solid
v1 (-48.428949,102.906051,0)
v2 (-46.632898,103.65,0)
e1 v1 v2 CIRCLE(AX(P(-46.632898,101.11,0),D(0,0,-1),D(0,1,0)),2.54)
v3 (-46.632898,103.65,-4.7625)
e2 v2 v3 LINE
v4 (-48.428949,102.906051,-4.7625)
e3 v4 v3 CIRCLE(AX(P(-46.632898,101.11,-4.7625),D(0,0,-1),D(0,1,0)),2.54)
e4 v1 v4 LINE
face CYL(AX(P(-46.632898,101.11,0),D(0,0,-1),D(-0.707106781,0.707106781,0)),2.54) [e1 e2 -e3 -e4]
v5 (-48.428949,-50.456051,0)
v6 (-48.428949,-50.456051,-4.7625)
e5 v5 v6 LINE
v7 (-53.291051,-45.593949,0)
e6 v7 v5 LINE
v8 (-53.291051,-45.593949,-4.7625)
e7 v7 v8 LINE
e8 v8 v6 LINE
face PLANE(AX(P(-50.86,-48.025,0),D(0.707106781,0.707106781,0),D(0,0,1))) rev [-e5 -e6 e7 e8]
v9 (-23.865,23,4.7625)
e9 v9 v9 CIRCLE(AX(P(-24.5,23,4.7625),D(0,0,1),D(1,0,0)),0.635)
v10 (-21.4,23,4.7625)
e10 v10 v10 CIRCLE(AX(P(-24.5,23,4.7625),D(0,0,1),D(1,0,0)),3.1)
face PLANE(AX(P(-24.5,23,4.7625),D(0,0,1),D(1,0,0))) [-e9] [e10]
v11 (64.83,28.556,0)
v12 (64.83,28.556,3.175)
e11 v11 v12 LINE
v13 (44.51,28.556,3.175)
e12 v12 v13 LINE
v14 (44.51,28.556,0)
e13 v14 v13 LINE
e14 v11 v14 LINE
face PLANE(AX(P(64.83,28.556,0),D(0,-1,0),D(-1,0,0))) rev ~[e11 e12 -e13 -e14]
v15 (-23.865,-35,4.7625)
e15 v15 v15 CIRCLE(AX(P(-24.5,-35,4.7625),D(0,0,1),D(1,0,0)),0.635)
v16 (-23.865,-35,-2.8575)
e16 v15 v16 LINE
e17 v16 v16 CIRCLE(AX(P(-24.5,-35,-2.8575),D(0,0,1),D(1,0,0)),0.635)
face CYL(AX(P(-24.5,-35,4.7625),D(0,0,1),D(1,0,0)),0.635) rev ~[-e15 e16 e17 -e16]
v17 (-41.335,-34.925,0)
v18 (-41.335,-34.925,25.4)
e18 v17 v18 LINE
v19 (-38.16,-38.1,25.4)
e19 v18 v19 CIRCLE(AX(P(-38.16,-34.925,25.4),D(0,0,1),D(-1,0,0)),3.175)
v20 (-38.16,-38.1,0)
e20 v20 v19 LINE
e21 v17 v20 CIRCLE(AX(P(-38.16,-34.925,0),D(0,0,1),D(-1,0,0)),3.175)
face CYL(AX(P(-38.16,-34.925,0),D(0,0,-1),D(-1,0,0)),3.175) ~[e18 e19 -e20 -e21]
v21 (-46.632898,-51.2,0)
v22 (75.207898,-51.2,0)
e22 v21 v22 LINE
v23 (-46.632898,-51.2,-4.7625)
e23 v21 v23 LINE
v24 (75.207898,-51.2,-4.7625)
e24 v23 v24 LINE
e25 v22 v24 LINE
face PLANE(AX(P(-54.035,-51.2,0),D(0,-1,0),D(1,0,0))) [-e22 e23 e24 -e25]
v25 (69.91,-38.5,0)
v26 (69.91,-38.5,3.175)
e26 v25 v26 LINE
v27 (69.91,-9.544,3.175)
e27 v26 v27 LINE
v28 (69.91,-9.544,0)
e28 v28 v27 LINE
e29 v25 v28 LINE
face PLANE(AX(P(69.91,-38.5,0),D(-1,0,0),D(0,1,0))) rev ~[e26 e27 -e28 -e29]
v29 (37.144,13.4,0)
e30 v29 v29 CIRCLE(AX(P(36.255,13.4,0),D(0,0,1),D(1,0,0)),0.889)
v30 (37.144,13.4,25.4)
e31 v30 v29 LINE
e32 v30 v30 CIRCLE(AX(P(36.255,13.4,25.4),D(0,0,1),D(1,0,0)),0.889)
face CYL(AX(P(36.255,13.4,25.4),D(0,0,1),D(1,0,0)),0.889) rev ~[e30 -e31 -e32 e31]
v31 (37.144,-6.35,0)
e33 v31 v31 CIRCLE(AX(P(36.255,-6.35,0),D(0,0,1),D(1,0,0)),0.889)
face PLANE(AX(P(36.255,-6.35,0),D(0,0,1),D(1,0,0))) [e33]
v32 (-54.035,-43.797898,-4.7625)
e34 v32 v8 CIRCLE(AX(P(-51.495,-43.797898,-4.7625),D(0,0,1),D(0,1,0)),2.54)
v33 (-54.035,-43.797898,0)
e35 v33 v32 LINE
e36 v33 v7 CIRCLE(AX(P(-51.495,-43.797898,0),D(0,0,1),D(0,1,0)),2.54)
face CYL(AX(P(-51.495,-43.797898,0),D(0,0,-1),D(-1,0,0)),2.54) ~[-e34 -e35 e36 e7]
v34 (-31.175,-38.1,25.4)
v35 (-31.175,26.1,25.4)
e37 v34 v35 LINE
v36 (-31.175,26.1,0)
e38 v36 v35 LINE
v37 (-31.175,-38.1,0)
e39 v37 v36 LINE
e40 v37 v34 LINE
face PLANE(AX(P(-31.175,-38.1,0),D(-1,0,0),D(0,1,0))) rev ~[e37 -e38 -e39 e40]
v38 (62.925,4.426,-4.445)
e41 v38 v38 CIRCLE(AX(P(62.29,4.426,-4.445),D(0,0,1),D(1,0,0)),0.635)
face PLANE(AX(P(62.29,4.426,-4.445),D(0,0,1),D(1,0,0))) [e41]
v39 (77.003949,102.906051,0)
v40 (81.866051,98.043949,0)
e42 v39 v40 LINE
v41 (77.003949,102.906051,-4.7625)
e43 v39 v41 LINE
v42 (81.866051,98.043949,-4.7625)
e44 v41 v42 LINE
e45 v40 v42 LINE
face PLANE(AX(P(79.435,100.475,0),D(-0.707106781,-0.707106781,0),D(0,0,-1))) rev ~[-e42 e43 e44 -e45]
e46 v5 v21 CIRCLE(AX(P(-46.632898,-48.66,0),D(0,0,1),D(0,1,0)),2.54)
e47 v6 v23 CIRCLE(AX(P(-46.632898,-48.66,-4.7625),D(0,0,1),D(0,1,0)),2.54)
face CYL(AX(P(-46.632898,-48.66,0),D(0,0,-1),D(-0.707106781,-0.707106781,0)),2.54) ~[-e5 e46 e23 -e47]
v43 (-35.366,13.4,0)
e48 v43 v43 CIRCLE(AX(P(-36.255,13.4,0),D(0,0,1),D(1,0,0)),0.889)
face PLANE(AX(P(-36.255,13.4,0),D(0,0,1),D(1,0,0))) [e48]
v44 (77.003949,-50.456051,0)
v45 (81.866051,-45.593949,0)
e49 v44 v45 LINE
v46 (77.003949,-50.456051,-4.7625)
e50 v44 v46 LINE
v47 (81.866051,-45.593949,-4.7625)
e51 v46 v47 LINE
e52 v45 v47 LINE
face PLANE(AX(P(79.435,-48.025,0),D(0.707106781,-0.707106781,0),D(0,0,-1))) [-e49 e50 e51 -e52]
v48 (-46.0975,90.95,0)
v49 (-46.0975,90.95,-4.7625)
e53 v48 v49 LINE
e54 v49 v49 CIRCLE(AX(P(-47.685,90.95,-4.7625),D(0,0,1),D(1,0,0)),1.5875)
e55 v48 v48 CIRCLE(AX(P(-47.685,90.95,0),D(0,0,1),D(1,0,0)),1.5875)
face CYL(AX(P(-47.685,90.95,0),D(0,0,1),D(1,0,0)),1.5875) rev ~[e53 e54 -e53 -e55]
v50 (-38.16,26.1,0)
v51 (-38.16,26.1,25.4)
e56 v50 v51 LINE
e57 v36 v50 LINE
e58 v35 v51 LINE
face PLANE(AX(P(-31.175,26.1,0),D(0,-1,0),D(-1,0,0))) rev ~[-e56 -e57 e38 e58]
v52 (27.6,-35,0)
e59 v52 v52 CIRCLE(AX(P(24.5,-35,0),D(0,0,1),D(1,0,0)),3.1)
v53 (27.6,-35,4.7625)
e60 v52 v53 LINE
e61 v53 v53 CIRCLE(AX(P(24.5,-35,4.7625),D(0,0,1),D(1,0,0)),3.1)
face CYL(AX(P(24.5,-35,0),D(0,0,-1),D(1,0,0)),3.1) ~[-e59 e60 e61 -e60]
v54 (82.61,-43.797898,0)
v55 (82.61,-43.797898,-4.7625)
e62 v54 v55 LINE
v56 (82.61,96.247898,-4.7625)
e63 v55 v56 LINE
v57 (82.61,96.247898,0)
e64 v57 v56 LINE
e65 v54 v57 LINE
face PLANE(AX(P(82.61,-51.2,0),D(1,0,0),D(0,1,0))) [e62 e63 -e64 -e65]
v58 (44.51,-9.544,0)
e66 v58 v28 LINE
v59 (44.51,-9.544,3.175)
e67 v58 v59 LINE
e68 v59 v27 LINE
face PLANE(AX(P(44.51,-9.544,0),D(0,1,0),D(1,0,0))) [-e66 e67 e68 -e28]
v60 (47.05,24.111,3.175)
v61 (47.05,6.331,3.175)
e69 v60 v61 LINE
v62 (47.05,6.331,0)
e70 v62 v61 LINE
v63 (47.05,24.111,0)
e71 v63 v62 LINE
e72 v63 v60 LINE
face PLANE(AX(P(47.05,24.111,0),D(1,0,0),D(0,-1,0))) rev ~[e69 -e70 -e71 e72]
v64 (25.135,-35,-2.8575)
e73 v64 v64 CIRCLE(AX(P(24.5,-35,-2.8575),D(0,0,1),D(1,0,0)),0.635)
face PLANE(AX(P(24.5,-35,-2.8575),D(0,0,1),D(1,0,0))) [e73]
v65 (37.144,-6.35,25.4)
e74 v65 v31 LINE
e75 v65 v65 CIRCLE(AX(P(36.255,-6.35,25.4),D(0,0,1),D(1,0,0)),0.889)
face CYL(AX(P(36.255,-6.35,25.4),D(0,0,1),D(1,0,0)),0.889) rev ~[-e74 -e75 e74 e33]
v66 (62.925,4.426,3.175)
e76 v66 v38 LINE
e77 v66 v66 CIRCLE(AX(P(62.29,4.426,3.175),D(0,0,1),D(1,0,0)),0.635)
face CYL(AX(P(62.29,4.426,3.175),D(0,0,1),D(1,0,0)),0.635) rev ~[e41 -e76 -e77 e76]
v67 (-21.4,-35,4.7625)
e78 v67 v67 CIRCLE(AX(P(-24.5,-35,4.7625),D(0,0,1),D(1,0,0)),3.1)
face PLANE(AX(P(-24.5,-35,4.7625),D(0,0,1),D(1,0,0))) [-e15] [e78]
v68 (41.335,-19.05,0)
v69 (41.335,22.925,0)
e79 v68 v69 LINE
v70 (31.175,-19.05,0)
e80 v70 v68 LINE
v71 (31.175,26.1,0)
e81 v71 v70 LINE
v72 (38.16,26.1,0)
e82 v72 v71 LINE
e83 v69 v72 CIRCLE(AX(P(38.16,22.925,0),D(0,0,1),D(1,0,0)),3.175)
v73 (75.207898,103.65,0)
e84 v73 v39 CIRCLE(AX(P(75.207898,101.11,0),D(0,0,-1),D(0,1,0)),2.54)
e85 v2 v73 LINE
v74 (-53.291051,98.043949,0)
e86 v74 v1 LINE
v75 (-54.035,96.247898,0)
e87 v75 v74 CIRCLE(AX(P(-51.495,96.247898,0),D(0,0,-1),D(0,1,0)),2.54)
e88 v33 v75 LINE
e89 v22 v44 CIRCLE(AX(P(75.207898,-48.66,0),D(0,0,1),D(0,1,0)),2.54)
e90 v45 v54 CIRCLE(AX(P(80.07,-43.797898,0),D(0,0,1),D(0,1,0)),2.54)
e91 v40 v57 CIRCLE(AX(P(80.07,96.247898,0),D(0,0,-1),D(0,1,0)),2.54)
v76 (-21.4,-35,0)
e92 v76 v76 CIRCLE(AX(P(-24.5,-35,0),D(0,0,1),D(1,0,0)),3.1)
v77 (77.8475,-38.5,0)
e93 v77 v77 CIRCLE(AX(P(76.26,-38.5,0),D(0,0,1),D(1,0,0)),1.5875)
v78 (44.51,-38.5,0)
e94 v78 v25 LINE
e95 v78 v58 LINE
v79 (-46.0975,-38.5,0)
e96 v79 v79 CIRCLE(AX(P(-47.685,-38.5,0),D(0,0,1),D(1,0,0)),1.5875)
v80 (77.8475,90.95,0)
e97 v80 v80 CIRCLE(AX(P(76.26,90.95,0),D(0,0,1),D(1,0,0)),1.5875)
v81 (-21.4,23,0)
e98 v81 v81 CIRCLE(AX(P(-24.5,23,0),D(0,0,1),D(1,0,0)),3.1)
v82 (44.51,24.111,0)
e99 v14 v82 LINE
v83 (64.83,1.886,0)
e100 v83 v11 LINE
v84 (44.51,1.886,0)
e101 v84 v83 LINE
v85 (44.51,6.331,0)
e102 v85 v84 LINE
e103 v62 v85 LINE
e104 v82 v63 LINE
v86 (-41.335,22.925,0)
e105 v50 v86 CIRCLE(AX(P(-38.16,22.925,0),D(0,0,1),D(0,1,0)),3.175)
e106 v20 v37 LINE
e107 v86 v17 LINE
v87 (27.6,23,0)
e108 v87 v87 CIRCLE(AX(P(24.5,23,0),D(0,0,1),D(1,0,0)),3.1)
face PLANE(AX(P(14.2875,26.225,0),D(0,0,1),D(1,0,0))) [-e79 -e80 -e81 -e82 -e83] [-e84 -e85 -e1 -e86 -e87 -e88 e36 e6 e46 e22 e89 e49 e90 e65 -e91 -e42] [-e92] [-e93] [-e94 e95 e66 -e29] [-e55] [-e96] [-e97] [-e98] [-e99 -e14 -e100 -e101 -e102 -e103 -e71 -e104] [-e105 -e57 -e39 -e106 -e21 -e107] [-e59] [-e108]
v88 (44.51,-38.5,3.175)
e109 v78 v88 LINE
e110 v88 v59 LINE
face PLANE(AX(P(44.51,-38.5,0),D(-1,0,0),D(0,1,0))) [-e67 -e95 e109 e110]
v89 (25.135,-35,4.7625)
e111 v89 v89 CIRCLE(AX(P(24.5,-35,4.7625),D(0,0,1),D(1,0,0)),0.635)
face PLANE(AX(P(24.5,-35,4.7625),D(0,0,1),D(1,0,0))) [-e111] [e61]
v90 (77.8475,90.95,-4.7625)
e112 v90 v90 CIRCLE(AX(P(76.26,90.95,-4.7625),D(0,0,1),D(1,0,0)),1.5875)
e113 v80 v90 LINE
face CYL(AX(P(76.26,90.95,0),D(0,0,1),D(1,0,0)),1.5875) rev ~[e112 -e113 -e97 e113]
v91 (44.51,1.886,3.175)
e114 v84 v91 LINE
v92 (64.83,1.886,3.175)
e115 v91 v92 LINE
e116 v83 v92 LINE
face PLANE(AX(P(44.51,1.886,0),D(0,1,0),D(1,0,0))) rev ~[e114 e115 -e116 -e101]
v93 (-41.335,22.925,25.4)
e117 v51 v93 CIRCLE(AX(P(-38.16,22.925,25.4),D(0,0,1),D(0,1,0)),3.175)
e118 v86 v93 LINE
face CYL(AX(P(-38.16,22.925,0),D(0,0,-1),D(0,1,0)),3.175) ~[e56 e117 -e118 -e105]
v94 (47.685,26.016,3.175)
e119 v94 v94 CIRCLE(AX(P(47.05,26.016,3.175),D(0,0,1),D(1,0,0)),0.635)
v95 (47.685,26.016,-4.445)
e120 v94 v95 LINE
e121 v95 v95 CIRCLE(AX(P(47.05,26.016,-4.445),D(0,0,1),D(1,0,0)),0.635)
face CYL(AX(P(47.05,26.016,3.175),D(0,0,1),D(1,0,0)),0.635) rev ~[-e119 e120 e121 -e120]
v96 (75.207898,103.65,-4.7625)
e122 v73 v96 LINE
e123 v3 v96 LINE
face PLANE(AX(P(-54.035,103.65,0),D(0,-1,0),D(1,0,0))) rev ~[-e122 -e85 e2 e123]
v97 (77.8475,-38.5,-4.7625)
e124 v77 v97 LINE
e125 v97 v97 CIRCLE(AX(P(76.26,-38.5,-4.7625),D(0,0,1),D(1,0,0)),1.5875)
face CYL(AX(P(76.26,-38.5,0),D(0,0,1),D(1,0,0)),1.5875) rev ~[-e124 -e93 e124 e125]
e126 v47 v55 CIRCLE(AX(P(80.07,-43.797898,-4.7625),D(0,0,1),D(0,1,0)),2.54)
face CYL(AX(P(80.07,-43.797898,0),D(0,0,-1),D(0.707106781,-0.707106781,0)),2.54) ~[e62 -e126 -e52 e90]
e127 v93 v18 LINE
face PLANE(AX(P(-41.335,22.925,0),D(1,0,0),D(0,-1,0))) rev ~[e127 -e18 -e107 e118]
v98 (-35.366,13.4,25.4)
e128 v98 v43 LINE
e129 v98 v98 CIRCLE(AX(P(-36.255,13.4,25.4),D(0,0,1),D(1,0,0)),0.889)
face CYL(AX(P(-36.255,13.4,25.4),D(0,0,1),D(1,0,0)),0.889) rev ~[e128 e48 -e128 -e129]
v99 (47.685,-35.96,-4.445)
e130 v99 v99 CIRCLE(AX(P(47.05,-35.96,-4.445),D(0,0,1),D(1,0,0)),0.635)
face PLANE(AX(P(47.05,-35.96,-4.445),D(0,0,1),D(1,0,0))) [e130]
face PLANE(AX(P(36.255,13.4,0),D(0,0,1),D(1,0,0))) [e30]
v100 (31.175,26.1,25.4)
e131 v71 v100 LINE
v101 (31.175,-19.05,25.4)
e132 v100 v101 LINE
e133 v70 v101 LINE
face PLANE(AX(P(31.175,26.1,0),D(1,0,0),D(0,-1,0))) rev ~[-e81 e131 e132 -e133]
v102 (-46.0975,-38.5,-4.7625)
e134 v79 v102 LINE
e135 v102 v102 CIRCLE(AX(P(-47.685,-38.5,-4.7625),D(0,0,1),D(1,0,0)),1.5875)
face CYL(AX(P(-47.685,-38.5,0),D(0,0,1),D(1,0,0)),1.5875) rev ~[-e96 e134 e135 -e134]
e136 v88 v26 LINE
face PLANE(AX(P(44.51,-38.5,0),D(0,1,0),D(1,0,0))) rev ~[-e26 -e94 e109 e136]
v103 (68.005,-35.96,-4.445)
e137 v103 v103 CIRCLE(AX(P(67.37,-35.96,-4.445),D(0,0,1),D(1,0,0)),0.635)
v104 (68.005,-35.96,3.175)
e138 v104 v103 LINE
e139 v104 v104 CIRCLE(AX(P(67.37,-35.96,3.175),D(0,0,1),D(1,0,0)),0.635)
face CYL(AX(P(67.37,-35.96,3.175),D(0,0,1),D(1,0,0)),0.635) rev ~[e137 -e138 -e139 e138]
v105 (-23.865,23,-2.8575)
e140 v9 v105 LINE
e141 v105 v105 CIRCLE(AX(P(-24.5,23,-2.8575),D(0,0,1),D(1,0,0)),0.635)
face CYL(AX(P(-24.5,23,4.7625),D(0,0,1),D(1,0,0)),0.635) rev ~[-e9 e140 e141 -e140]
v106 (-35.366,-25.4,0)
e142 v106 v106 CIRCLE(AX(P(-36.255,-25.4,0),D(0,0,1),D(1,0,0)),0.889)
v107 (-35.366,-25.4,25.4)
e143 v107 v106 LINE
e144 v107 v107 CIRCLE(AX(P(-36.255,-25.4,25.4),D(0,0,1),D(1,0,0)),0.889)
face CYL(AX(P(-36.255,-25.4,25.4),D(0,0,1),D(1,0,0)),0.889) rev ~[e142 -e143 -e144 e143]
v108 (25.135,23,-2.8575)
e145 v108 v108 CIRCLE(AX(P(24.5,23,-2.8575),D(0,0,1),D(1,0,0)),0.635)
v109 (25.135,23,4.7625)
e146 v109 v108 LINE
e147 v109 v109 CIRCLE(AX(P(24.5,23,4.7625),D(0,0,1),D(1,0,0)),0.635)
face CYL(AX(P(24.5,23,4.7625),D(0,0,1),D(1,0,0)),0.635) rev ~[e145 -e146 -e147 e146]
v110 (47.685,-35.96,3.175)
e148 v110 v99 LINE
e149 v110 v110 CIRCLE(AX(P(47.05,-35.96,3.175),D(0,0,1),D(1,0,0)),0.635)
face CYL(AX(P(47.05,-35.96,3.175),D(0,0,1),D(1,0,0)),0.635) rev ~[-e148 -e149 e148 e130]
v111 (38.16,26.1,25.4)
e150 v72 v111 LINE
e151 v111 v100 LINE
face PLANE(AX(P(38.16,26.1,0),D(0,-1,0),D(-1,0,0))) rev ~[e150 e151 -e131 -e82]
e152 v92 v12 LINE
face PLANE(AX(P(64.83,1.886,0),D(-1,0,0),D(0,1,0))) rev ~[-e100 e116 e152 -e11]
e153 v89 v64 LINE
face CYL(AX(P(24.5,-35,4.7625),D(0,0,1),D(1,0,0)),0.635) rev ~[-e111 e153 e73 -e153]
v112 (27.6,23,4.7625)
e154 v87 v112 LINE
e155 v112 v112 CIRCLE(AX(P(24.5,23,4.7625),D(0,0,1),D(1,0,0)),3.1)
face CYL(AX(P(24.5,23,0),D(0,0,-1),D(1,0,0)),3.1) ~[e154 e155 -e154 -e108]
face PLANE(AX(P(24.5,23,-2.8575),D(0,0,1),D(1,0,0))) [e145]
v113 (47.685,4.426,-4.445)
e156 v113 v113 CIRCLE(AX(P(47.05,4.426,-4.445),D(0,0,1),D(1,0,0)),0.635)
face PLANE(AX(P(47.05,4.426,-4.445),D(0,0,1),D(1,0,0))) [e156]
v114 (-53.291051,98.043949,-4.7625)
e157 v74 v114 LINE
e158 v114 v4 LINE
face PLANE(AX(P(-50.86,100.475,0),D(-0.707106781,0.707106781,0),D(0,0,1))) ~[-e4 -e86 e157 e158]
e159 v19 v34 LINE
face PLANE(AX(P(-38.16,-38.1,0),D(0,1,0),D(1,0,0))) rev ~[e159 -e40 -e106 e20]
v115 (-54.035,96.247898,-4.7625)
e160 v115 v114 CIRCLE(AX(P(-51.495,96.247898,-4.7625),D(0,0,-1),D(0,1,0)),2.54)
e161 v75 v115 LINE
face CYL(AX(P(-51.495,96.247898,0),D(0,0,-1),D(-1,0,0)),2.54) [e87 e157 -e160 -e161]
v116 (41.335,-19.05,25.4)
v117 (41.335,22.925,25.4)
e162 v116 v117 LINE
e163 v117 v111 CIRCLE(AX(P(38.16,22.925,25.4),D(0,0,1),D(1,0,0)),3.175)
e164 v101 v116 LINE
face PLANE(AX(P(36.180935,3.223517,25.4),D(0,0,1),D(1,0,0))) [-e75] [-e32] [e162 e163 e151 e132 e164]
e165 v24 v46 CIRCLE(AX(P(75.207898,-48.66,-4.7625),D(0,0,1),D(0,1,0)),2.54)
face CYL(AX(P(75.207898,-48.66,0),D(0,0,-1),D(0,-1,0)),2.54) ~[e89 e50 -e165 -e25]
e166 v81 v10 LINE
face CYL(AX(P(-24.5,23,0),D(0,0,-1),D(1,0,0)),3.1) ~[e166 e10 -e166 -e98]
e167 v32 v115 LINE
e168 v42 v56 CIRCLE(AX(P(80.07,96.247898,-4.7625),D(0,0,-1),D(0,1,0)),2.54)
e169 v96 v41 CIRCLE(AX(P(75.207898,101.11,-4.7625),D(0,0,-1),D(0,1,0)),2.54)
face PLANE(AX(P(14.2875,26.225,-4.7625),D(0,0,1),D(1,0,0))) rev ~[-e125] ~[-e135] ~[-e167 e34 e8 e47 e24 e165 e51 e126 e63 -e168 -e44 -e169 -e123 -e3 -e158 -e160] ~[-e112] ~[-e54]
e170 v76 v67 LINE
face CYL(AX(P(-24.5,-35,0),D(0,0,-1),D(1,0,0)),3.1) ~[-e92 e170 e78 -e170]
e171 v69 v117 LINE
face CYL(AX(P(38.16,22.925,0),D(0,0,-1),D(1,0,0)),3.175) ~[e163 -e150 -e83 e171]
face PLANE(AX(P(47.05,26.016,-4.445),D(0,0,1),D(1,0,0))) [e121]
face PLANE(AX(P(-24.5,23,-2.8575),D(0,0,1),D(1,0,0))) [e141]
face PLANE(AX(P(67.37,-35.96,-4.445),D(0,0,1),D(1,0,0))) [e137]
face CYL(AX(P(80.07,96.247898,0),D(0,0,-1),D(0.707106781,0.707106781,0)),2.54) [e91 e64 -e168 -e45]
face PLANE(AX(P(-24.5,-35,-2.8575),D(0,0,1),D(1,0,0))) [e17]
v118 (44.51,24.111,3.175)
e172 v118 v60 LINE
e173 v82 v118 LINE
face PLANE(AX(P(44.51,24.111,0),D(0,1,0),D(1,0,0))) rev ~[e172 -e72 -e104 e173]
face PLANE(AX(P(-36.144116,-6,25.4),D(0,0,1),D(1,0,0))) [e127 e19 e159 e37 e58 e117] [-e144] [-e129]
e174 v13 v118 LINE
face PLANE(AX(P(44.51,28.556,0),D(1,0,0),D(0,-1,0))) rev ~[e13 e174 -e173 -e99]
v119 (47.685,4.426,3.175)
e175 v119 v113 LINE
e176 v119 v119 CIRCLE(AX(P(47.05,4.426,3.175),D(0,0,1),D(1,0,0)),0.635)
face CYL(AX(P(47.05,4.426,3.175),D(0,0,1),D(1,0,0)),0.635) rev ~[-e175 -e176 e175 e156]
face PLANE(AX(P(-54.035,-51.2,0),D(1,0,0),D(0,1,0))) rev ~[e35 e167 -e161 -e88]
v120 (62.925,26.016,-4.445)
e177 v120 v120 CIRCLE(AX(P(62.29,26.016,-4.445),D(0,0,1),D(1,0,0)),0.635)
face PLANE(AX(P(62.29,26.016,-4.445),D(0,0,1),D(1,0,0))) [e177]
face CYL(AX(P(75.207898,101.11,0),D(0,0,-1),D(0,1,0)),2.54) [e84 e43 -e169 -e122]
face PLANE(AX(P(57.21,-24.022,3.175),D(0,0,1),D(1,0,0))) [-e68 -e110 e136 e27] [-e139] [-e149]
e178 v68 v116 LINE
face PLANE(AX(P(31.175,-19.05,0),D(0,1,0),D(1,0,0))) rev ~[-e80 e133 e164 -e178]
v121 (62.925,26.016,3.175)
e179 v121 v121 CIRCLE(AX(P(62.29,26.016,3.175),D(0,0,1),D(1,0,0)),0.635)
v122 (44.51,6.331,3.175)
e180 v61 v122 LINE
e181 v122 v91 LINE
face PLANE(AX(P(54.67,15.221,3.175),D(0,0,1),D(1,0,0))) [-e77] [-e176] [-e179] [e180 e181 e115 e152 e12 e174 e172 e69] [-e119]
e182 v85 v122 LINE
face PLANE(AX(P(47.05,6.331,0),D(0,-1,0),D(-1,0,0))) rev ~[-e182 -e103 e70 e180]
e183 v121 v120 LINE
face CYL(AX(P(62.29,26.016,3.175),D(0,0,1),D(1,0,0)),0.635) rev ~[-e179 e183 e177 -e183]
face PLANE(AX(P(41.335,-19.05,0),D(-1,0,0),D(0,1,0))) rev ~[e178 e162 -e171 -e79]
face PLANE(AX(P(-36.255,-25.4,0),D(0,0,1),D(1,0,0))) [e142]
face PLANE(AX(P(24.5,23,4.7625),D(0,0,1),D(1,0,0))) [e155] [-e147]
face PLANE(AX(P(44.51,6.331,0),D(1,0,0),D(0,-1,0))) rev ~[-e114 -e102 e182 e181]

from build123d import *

# Parameters (mm, degrees)
F4_W      = 136.645
F4_H      = 154.85
F5_DEPTH  = 4.7625
F0_R      = 3.1
F0_R_2    = 1.375
F6_DEPTH  = 4.7625
F7_DEPTH  = 25.4
F3_R      = 1.143
F8_DEPTH  = 3.175
F2_W      = 25.4
F2_H      = 28.956
F2_R      = 1.143
F9_DEPTH  = 3.175
F10_R     = 0.635
F11_DEPTH = 7.62
F12_R     = 0.635
F14_DEPTH = 7.62
F15_R     = 0.889
F16_DEPTH = 25.4
F17_SIZE  = 6.35
F18_R     = 2.54
F19_R     = 1.5875
F20_DEPTH = 4.7635


# Not quite as in the source:
# - a feature names something its author has since deleted; it is built from what else it names


with BuildPart() as f5:
    # F4 (on Top) → F5 (new body)
    with BuildSketch(Plane.XY):
        with Locations((14.2875, 26.225)):
            Rectangle(F4_W, F4_H)
    extrude(amount=-F5_DEPTH)

    # F0 (on Top) → F6 (join)
    with BuildSketch(Plane.XY):
        with Locations((-24.5, 23)):
            Circle(F0_R)
        with Locations((-24.5, 23)):
            Circle(F0_R_2, mode=Mode.SUBTRACT)
        with Locations((24.5, 23)):
            Circle(F0_R)
        with Locations((24.5, 23)):
            Circle(F0_R_2, mode=Mode.SUBTRACT)
        with Locations((-24.5, -35)):
            Circle(F0_R)
        with Locations((-24.5, -35)):
            Circle(F0_R_2, mode=Mode.SUBTRACT)
        with Locations((24.5, -35)):
            Circle(F0_R)
        with Locations((24.5, -35)):
            Circle(F0_R_2, mode=Mode.SUBTRACT)
        with Locations((-24.5, 23)):
            Circle(F0_R_2)
        with Locations((24.5, 23)):
            Circle(F0_R_2)
        with Locations((-24.5, -35)):
            Circle(F0_R_2)
        with Locations((24.5, -35)):
            Circle(F0_R_2)
    extrude(amount=F6_DEPTH)

    # F1 (on Top) → F7 (join)
    with BuildSketch(Plane.XY):
        with BuildLine():
            ThreePointArc((-41.335, -34.925), (-40.4050640303, -37.1700640303), (-38.16, -38.1))
            Line((-38.16, -38.1), (-34.35, -38.1))
            Line((-34.35, -38.1), (-31.175, -38.1))
            Line((-31.175, -38.1), (-31.175, -34.925))
            Line((-31.175, -34.925), (-31.175, 22.925))
            Line((-31.175, 22.925), (-31.175, 26.1))
            Line((-31.175, 26.1), (-38.16, 26.1))
            ThreePointArc((-38.16, 26.1), (-40.4050640303, 25.1700640303), (-41.335, 22.925))
            Line((-41.335, 22.925), (-41.335, -34.925))
        make_face()
        with BuildLine():
            Line((31.175, 26.1), (31.175, 22.925))
            Line((31.175, 22.925), (31.175, -19.05))
            Line((31.175, -19.05), (41.335, -19.05))
            Line((41.335, -19.05), (41.335, 22.925))
            ThreePointArc((41.335, 22.925), (40.4050640303, 25.1700640303), (38.16, 26.1))
            Line((38.16, 26.1), (31.175, 26.1))
        make_face()
    extrude(amount=F7_DEPTH)

    # F3 (on Top) → F8 (join)
    with BuildSketch(Plane.XY):
        Polygon((64.83, 28.556), (44.51, 28.556), (44.51, 24.111), (47.05, 24.111), (47.05, 6.331), (44.51, 6.331), (44.51, 1.886), (64.83, 1.886), align=None)
        with Locations((47.05, 4.426)):
            Circle(F3_R, mode=Mode.SUBTRACT)
        with Locations((62.29, 4.426)):
            Circle(F3_R, mode=Mode.SUBTRACT)
        with Locations((47.05, 26.016)):
            Circle(F3_R, mode=Mode.SUBTRACT)
        with Locations((62.29, 26.016)):
            Circle(F3_R, mode=Mode.SUBTRACT)
        with Locations((62.29, 4.426)):
            Circle(F3_R)
        with Locations((62.29, 26.016)):
            Circle(F3_R)
        with Locations((47.05, 26.016)):
            Circle(F3_R)
        with Locations((47.05, 4.426)):
            Circle(F3_R)
    extrude(amount=F8_DEPTH)

    # F2 (on Top) → F9 (join)
    with BuildSketch(Plane.XY):
        with Locations((57.21, -24.022)):
            Rectangle(F2_W, F2_H)
        with Locations((47.05, -35.96)):
            Circle(F2_R, mode=Mode.SUBTRACT)
        with Locations((67.37, -35.96)):
            Circle(F2_R, mode=Mode.SUBTRACT)
        with Locations((47.05, -35.96)):
            Circle(F2_R)
        with Locations((67.37, -35.96)):
            Circle(F2_R)
    extrude(amount=F9_DEPTH)

    # F10 (on face) → F11 (cut)
    with BuildSketch(Plane.XY.offset(3.175)):
        with Locations((47.05, 26.016)):
            Circle(F10_R)
        with Locations((62.29, 26.016)):
            Circle(F10_R)
        with Locations((62.29, 4.426)):
            Circle(F10_R)
        with Locations((47.05, 4.426)):
            Circle(F10_R)
        with Locations((47.05, -35.96)):
            Circle(F10_R)
        with Locations((67.37, -35.96)):
            Circle(F10_R)
    extrude(amount=-F11_DEPTH, mode=Mode.SUBTRACT)

    # F12 (on face) → F14 (cut)
    with BuildSketch(Plane.XY.offset(4.7625)):
        with Locations((-24.5, 23)):
            Circle(F12_R)
        with Locations((24.5, 23)):
            Circle(F12_R)
        with Locations((24.5, -35)):
            Circle(F12_R)
        with Locations((-24.5, -35)):
            Circle(F12_R)
    extrude(amount=-F14_DEPTH, mode=Mode.SUBTRACT)

    # F15 (on face) → F16 (cut)
    with BuildSketch(Plane.XY.offset(25.4)):
        with Locations((-36.255, 13.4)):
            Circle(F15_R)
        with Locations((36.255, -6.35)):
            Circle(F15_R)
        with Locations((36.255, 13.4)):
            Circle(F15_R)
        with Locations((-36.255, -25.4)):
            Circle(F15_R)
    extrude(amount=-F16_DEPTH, mode=Mode.SUBTRACT)

    # F17
    f17_edges = [f5.edges().sort_by_distance(p)[0] for p in [
        (-54.035, 103.65, -2.38125),
        (82.61, 103.65, -2.38125),
        (82.61, -51.2, -2.38125),
        (-54.035, -51.2, -2.38125),
    ]]
    chamfer(f17_edges, length=F17_SIZE)

    # F18
    f18_edges = [f5.edges().sort_by_distance(p)[0] for p in [
        (82.61, 97.3, -2.38125),
        (76.26, 103.65, -2.38125),
        (-47.685, 103.65, -2.38125),
        (-54.035, 97.3, -2.38125),
        (-54.035, -44.85, -2.38125),
        (-47.685, -51.2, -2.38125),
        (76.26, -51.2, -2.38125),
        (82.61, -44.85, -2.38125),
    ]]
    fillet(f18_edges, radius=F18_R)

    # F19 (on face) → F20 (cut, through all)
    with BuildSketch(Plane.XY):
        with Locations((-47.685, 90.95)):
            Circle(F19_R)
        with Locations((76.26, 90.95)):
            Circle(F19_R)
        with Locations((76.26, -38.5)):
            Circle(F19_R)
        with Locations((-47.685, -38.5)):
            Circle(F19_R)
    extrude(amount=-F20_DEPTH, mode=Mode.SUBTRACT)


solid = f5.part
